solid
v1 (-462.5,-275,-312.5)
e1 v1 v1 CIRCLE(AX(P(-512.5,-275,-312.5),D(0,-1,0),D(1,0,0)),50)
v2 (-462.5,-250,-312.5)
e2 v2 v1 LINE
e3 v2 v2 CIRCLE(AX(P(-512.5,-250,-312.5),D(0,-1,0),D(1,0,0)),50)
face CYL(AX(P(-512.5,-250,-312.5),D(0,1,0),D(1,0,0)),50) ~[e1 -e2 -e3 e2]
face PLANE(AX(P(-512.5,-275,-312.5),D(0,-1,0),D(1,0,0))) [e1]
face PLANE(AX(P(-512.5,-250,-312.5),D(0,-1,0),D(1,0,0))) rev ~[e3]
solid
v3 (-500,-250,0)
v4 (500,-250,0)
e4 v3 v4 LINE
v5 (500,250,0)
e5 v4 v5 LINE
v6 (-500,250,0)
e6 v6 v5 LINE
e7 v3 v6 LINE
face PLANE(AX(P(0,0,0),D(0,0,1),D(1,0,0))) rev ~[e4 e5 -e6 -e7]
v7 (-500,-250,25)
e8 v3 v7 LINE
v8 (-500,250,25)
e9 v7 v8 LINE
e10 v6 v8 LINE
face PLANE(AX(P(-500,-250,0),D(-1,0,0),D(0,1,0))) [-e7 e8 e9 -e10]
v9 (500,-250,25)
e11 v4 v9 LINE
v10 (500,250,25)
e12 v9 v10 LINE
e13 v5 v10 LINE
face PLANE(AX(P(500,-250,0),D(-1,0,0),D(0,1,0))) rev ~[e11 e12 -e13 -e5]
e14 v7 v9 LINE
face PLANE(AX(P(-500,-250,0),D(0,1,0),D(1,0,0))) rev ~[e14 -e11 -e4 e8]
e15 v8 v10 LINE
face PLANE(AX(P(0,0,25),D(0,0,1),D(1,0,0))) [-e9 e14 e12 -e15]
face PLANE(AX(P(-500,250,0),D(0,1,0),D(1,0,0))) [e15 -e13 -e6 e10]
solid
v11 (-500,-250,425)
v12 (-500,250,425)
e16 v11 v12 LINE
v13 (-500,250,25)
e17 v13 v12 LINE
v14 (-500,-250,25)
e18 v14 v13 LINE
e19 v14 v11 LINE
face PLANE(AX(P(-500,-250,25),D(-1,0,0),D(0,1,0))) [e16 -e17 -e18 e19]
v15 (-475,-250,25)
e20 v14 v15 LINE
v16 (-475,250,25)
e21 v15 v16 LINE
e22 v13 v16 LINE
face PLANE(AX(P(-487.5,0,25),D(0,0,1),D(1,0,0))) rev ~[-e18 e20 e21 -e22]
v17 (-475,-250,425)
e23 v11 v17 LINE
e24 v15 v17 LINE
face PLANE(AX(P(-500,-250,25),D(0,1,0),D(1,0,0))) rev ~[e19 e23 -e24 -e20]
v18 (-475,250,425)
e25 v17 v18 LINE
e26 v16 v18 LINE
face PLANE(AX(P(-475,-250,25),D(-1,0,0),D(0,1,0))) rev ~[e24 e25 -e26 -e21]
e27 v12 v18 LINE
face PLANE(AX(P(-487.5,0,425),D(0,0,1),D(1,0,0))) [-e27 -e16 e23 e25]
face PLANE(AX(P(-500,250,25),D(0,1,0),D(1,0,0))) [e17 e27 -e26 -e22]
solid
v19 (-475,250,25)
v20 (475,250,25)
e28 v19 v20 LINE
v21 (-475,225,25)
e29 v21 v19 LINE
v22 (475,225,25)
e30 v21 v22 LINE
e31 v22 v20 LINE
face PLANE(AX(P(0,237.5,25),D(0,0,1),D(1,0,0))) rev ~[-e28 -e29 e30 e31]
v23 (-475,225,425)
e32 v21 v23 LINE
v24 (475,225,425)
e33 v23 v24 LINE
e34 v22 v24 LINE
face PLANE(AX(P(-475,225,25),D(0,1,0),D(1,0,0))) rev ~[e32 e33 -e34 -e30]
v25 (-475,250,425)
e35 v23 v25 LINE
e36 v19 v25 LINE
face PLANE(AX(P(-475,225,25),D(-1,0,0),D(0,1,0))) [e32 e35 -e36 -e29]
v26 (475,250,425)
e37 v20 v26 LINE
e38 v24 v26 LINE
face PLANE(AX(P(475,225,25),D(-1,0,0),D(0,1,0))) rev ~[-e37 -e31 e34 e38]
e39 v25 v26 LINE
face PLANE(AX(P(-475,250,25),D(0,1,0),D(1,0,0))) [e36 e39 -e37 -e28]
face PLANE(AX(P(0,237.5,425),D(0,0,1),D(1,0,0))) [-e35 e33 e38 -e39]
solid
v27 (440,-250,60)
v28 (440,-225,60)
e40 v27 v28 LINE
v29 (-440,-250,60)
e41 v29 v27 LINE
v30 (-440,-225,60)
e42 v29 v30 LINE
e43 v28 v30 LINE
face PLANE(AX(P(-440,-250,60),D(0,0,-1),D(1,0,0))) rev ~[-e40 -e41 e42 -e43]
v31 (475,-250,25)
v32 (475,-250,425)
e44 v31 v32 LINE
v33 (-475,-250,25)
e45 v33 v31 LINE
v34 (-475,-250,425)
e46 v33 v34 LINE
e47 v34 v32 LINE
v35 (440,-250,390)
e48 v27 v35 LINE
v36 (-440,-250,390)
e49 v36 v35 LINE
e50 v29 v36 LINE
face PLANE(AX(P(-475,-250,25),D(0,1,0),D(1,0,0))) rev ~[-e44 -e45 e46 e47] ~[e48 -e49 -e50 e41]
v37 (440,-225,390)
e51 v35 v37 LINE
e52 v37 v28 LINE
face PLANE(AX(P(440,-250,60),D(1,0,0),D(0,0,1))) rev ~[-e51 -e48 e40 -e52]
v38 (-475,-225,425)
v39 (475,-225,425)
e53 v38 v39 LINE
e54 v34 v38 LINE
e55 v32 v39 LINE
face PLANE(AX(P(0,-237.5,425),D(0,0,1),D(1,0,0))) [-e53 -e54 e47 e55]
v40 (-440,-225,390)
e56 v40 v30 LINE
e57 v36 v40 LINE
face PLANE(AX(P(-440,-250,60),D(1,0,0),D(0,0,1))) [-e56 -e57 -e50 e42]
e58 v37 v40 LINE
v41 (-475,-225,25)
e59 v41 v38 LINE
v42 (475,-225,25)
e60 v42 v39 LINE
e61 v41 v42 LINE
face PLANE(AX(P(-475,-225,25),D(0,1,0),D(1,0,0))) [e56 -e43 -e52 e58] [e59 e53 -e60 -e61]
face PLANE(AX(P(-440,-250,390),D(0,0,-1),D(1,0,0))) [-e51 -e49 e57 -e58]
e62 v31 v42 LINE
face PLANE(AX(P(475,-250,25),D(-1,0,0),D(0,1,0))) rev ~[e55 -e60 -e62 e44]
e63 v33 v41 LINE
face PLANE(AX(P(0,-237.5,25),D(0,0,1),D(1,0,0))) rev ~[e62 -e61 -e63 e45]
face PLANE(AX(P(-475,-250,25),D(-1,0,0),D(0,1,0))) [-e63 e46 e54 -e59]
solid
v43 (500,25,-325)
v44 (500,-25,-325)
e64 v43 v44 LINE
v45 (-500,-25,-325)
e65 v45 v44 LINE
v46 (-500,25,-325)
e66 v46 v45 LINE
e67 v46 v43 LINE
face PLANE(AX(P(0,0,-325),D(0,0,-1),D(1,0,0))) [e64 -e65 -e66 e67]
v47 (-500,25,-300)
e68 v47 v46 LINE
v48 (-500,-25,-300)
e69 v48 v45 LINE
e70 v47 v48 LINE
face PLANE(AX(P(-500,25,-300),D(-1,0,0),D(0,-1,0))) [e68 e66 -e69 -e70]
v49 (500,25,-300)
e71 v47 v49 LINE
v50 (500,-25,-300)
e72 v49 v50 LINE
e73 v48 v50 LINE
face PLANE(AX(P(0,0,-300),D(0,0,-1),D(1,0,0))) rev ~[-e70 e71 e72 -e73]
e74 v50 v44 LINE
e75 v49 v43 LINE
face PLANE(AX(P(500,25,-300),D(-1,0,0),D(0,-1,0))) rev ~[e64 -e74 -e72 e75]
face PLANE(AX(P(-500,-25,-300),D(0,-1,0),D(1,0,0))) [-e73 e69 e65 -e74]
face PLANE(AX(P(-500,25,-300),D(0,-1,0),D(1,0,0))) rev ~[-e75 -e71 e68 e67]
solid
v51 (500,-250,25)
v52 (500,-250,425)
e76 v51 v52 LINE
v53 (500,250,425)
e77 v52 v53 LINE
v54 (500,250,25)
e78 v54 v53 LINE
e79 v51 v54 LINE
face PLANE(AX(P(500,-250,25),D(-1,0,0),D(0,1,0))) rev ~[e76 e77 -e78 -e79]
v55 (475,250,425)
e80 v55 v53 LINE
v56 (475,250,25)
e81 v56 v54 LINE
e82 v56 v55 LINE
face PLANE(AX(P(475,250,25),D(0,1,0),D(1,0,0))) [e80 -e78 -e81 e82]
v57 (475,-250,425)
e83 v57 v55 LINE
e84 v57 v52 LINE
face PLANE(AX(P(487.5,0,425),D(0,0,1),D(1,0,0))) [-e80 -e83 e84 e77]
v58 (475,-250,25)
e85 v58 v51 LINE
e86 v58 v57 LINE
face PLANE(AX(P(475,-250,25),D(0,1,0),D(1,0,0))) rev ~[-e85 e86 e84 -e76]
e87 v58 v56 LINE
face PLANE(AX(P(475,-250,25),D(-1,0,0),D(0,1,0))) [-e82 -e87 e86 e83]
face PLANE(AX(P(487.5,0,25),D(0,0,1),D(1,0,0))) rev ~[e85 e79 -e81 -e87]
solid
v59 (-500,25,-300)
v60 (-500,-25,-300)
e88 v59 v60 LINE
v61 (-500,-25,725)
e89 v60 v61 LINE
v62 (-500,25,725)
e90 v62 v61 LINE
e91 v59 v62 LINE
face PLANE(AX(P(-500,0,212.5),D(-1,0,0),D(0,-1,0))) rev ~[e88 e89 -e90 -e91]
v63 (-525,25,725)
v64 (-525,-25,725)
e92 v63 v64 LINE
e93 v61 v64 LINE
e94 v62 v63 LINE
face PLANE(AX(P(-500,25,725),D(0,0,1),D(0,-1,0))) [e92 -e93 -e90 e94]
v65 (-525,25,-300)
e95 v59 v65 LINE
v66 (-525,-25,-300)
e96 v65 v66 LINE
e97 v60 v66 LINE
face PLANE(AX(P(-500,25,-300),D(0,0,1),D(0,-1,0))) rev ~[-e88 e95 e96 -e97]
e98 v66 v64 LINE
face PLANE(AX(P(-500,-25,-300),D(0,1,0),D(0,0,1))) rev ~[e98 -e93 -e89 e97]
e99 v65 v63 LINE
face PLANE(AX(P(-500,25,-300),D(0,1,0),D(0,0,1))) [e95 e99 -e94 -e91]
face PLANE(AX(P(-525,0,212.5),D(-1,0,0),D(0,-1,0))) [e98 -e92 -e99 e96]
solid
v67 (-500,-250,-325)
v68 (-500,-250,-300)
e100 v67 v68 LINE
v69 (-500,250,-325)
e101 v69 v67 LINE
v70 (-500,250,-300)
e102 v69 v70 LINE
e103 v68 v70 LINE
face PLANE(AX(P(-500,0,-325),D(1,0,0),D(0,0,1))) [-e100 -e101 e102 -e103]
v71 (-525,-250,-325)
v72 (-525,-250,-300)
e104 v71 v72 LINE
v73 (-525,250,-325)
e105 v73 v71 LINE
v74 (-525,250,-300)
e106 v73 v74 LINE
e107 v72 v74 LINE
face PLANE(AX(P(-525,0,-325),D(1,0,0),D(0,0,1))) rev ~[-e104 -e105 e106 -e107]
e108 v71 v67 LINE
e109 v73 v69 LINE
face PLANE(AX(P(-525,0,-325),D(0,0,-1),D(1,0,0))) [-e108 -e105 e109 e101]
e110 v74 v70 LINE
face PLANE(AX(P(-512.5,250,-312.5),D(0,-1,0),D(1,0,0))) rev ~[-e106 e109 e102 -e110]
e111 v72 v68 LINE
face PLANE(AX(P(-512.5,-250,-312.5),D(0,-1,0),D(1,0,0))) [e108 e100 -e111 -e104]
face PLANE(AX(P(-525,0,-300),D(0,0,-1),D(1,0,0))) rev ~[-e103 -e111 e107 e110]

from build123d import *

# Parameters (mm, degrees)
F0_W           = 1000
F0_H           = 500
F1_DEPTH       = 25
F2_W           = 25
F2_H           = 500
F3_DEPTH       = 400
F4_W           = 25
F4_H           = 500
F5_DEPTH       = 400
F6_W           = 950
F6_H           = 25
F7_DEPTH       = 400
F8_W           = 950
F8_H           = 25
F9_DEPTH       = 400
F10_W          = 50
F10_H          = 1025
F11_DEPTH      = 25
F12_W          = 50
F12_H          = 1025
F13_DEPTH      = 25
F14_W          = 1000
F14_H          = 50
F15_DEPTH      = 25
F16_W          = 25
F16_H          = 25
F17_DEPTH      = 250
F17_DEPTH_BACK = 250
F18_R          = 50
F19_DEPTH      = 25
F21_W          = 880
F21_H          = 330
F22_DEPTH      = 500.001


# Not quite as in the source:
# - the program builds the solid bodies; features that only make, move or delete a surface that nothing else refers to are left out


with BuildPart() as f1:
    # F0 (on Top) → F1 (new body)
    with BuildSketch(Plane.XY):
        Rectangle(F0_W, F0_H)
    extrude(amount=F1_DEPTH)


with BuildPart() as f3:
    # F2 (on face) → F3 (new body)
    with BuildSketch(Plane.XY.offset(25)):
        with Locations((-487.5, 0)):
            Rectangle(F2_W, F2_H)
    extrude(amount=F3_DEPTH)


with BuildPart() as f5:
    # F4 (on face) → F5 (new body, through all)
    with BuildSketch(Plane.XY.offset(25)):
        with Locations((487.5, 0)):
            Rectangle(F4_W, F4_H)
    extrude(amount=F5_DEPTH)


with BuildPart() as f7:
    # F6 (on face) → F7 (new body, through all)
    with BuildSketch(Plane.XY.offset(25)):
        with Locations((0, 237.5)):
            Rectangle(F6_W, F6_H)
    extrude(amount=F7_DEPTH)


with BuildPart() as f9:
    # F8 (on face) → F9 (new body, through all)
    with BuildSketch(Plane.XY.offset(25)):
        with Locations((0, -237.5)):
            Rectangle(F8_W, F8_H)
    extrude(amount=F9_DEPTH)

    # F21 (on face) → F22 (cut, through all)
    with BuildSketch(Plane.XZ.offset(250)):
        with Locations((0, 225)):
            Rectangle(F21_W, F21_H)
    extrude(amount=-F22_DEPTH, mode=Mode.SUBTRACT)


with BuildPart() as f11:
    # F10 (on face) → F11 (new body)
    with BuildSketch(Plane.YZ.offset(500)):
        with Locations((0, 212.5)):
            Rectangle(F10_W, F10_H)
    extrude(amount=F11_DEPTH)


with BuildPart() as f13:
    # F12 (on face) → F13 (new body)
    with BuildSketch(Plane(origin=(-500, 0, 0), x_dir=(0, -1, 0), z_dir=(-1, 0, 0))):
        with Locations((0, 212.5)):
            Rectangle(F12_W, F12_H)
    extrude(amount=F13_DEPTH)


with BuildPart() as f15:
    # F14 (on face) → F15 (new body)
    with BuildSketch(Plane(origin=(0, 0, -300), x_dir=(1, 0, 0), z_dir=(0, 0, -1))):
        Rectangle(F14_W, F14_H)
    extrude(amount=F15_DEPTH)


with BuildPart() as f17:
    # F16 (on Front) → F17 (new body, two sides)
    with BuildSketch(Plane.XZ) as f17_sk:
        with Locations((-512.5, -312.5)):
            Rectangle(F16_W, F16_H)
    extrude(amount=F17_DEPTH)
    extrude(f17_sk.sketch, amount=-F17_DEPTH_BACK)


with BuildPart() as f19:
    # F18 (on face) → F19 (new body)
    with BuildSketch(Plane.XZ.offset(250)):
        with Locations((-512.5, -312.5)):
            Circle(F18_R)
    extrude(amount=F19_DEPTH)


solid = Compound([f1.part, f3.part, f5.part, f7.part, f9.part, f13.part, f15.part, f17.part, f19.part])
